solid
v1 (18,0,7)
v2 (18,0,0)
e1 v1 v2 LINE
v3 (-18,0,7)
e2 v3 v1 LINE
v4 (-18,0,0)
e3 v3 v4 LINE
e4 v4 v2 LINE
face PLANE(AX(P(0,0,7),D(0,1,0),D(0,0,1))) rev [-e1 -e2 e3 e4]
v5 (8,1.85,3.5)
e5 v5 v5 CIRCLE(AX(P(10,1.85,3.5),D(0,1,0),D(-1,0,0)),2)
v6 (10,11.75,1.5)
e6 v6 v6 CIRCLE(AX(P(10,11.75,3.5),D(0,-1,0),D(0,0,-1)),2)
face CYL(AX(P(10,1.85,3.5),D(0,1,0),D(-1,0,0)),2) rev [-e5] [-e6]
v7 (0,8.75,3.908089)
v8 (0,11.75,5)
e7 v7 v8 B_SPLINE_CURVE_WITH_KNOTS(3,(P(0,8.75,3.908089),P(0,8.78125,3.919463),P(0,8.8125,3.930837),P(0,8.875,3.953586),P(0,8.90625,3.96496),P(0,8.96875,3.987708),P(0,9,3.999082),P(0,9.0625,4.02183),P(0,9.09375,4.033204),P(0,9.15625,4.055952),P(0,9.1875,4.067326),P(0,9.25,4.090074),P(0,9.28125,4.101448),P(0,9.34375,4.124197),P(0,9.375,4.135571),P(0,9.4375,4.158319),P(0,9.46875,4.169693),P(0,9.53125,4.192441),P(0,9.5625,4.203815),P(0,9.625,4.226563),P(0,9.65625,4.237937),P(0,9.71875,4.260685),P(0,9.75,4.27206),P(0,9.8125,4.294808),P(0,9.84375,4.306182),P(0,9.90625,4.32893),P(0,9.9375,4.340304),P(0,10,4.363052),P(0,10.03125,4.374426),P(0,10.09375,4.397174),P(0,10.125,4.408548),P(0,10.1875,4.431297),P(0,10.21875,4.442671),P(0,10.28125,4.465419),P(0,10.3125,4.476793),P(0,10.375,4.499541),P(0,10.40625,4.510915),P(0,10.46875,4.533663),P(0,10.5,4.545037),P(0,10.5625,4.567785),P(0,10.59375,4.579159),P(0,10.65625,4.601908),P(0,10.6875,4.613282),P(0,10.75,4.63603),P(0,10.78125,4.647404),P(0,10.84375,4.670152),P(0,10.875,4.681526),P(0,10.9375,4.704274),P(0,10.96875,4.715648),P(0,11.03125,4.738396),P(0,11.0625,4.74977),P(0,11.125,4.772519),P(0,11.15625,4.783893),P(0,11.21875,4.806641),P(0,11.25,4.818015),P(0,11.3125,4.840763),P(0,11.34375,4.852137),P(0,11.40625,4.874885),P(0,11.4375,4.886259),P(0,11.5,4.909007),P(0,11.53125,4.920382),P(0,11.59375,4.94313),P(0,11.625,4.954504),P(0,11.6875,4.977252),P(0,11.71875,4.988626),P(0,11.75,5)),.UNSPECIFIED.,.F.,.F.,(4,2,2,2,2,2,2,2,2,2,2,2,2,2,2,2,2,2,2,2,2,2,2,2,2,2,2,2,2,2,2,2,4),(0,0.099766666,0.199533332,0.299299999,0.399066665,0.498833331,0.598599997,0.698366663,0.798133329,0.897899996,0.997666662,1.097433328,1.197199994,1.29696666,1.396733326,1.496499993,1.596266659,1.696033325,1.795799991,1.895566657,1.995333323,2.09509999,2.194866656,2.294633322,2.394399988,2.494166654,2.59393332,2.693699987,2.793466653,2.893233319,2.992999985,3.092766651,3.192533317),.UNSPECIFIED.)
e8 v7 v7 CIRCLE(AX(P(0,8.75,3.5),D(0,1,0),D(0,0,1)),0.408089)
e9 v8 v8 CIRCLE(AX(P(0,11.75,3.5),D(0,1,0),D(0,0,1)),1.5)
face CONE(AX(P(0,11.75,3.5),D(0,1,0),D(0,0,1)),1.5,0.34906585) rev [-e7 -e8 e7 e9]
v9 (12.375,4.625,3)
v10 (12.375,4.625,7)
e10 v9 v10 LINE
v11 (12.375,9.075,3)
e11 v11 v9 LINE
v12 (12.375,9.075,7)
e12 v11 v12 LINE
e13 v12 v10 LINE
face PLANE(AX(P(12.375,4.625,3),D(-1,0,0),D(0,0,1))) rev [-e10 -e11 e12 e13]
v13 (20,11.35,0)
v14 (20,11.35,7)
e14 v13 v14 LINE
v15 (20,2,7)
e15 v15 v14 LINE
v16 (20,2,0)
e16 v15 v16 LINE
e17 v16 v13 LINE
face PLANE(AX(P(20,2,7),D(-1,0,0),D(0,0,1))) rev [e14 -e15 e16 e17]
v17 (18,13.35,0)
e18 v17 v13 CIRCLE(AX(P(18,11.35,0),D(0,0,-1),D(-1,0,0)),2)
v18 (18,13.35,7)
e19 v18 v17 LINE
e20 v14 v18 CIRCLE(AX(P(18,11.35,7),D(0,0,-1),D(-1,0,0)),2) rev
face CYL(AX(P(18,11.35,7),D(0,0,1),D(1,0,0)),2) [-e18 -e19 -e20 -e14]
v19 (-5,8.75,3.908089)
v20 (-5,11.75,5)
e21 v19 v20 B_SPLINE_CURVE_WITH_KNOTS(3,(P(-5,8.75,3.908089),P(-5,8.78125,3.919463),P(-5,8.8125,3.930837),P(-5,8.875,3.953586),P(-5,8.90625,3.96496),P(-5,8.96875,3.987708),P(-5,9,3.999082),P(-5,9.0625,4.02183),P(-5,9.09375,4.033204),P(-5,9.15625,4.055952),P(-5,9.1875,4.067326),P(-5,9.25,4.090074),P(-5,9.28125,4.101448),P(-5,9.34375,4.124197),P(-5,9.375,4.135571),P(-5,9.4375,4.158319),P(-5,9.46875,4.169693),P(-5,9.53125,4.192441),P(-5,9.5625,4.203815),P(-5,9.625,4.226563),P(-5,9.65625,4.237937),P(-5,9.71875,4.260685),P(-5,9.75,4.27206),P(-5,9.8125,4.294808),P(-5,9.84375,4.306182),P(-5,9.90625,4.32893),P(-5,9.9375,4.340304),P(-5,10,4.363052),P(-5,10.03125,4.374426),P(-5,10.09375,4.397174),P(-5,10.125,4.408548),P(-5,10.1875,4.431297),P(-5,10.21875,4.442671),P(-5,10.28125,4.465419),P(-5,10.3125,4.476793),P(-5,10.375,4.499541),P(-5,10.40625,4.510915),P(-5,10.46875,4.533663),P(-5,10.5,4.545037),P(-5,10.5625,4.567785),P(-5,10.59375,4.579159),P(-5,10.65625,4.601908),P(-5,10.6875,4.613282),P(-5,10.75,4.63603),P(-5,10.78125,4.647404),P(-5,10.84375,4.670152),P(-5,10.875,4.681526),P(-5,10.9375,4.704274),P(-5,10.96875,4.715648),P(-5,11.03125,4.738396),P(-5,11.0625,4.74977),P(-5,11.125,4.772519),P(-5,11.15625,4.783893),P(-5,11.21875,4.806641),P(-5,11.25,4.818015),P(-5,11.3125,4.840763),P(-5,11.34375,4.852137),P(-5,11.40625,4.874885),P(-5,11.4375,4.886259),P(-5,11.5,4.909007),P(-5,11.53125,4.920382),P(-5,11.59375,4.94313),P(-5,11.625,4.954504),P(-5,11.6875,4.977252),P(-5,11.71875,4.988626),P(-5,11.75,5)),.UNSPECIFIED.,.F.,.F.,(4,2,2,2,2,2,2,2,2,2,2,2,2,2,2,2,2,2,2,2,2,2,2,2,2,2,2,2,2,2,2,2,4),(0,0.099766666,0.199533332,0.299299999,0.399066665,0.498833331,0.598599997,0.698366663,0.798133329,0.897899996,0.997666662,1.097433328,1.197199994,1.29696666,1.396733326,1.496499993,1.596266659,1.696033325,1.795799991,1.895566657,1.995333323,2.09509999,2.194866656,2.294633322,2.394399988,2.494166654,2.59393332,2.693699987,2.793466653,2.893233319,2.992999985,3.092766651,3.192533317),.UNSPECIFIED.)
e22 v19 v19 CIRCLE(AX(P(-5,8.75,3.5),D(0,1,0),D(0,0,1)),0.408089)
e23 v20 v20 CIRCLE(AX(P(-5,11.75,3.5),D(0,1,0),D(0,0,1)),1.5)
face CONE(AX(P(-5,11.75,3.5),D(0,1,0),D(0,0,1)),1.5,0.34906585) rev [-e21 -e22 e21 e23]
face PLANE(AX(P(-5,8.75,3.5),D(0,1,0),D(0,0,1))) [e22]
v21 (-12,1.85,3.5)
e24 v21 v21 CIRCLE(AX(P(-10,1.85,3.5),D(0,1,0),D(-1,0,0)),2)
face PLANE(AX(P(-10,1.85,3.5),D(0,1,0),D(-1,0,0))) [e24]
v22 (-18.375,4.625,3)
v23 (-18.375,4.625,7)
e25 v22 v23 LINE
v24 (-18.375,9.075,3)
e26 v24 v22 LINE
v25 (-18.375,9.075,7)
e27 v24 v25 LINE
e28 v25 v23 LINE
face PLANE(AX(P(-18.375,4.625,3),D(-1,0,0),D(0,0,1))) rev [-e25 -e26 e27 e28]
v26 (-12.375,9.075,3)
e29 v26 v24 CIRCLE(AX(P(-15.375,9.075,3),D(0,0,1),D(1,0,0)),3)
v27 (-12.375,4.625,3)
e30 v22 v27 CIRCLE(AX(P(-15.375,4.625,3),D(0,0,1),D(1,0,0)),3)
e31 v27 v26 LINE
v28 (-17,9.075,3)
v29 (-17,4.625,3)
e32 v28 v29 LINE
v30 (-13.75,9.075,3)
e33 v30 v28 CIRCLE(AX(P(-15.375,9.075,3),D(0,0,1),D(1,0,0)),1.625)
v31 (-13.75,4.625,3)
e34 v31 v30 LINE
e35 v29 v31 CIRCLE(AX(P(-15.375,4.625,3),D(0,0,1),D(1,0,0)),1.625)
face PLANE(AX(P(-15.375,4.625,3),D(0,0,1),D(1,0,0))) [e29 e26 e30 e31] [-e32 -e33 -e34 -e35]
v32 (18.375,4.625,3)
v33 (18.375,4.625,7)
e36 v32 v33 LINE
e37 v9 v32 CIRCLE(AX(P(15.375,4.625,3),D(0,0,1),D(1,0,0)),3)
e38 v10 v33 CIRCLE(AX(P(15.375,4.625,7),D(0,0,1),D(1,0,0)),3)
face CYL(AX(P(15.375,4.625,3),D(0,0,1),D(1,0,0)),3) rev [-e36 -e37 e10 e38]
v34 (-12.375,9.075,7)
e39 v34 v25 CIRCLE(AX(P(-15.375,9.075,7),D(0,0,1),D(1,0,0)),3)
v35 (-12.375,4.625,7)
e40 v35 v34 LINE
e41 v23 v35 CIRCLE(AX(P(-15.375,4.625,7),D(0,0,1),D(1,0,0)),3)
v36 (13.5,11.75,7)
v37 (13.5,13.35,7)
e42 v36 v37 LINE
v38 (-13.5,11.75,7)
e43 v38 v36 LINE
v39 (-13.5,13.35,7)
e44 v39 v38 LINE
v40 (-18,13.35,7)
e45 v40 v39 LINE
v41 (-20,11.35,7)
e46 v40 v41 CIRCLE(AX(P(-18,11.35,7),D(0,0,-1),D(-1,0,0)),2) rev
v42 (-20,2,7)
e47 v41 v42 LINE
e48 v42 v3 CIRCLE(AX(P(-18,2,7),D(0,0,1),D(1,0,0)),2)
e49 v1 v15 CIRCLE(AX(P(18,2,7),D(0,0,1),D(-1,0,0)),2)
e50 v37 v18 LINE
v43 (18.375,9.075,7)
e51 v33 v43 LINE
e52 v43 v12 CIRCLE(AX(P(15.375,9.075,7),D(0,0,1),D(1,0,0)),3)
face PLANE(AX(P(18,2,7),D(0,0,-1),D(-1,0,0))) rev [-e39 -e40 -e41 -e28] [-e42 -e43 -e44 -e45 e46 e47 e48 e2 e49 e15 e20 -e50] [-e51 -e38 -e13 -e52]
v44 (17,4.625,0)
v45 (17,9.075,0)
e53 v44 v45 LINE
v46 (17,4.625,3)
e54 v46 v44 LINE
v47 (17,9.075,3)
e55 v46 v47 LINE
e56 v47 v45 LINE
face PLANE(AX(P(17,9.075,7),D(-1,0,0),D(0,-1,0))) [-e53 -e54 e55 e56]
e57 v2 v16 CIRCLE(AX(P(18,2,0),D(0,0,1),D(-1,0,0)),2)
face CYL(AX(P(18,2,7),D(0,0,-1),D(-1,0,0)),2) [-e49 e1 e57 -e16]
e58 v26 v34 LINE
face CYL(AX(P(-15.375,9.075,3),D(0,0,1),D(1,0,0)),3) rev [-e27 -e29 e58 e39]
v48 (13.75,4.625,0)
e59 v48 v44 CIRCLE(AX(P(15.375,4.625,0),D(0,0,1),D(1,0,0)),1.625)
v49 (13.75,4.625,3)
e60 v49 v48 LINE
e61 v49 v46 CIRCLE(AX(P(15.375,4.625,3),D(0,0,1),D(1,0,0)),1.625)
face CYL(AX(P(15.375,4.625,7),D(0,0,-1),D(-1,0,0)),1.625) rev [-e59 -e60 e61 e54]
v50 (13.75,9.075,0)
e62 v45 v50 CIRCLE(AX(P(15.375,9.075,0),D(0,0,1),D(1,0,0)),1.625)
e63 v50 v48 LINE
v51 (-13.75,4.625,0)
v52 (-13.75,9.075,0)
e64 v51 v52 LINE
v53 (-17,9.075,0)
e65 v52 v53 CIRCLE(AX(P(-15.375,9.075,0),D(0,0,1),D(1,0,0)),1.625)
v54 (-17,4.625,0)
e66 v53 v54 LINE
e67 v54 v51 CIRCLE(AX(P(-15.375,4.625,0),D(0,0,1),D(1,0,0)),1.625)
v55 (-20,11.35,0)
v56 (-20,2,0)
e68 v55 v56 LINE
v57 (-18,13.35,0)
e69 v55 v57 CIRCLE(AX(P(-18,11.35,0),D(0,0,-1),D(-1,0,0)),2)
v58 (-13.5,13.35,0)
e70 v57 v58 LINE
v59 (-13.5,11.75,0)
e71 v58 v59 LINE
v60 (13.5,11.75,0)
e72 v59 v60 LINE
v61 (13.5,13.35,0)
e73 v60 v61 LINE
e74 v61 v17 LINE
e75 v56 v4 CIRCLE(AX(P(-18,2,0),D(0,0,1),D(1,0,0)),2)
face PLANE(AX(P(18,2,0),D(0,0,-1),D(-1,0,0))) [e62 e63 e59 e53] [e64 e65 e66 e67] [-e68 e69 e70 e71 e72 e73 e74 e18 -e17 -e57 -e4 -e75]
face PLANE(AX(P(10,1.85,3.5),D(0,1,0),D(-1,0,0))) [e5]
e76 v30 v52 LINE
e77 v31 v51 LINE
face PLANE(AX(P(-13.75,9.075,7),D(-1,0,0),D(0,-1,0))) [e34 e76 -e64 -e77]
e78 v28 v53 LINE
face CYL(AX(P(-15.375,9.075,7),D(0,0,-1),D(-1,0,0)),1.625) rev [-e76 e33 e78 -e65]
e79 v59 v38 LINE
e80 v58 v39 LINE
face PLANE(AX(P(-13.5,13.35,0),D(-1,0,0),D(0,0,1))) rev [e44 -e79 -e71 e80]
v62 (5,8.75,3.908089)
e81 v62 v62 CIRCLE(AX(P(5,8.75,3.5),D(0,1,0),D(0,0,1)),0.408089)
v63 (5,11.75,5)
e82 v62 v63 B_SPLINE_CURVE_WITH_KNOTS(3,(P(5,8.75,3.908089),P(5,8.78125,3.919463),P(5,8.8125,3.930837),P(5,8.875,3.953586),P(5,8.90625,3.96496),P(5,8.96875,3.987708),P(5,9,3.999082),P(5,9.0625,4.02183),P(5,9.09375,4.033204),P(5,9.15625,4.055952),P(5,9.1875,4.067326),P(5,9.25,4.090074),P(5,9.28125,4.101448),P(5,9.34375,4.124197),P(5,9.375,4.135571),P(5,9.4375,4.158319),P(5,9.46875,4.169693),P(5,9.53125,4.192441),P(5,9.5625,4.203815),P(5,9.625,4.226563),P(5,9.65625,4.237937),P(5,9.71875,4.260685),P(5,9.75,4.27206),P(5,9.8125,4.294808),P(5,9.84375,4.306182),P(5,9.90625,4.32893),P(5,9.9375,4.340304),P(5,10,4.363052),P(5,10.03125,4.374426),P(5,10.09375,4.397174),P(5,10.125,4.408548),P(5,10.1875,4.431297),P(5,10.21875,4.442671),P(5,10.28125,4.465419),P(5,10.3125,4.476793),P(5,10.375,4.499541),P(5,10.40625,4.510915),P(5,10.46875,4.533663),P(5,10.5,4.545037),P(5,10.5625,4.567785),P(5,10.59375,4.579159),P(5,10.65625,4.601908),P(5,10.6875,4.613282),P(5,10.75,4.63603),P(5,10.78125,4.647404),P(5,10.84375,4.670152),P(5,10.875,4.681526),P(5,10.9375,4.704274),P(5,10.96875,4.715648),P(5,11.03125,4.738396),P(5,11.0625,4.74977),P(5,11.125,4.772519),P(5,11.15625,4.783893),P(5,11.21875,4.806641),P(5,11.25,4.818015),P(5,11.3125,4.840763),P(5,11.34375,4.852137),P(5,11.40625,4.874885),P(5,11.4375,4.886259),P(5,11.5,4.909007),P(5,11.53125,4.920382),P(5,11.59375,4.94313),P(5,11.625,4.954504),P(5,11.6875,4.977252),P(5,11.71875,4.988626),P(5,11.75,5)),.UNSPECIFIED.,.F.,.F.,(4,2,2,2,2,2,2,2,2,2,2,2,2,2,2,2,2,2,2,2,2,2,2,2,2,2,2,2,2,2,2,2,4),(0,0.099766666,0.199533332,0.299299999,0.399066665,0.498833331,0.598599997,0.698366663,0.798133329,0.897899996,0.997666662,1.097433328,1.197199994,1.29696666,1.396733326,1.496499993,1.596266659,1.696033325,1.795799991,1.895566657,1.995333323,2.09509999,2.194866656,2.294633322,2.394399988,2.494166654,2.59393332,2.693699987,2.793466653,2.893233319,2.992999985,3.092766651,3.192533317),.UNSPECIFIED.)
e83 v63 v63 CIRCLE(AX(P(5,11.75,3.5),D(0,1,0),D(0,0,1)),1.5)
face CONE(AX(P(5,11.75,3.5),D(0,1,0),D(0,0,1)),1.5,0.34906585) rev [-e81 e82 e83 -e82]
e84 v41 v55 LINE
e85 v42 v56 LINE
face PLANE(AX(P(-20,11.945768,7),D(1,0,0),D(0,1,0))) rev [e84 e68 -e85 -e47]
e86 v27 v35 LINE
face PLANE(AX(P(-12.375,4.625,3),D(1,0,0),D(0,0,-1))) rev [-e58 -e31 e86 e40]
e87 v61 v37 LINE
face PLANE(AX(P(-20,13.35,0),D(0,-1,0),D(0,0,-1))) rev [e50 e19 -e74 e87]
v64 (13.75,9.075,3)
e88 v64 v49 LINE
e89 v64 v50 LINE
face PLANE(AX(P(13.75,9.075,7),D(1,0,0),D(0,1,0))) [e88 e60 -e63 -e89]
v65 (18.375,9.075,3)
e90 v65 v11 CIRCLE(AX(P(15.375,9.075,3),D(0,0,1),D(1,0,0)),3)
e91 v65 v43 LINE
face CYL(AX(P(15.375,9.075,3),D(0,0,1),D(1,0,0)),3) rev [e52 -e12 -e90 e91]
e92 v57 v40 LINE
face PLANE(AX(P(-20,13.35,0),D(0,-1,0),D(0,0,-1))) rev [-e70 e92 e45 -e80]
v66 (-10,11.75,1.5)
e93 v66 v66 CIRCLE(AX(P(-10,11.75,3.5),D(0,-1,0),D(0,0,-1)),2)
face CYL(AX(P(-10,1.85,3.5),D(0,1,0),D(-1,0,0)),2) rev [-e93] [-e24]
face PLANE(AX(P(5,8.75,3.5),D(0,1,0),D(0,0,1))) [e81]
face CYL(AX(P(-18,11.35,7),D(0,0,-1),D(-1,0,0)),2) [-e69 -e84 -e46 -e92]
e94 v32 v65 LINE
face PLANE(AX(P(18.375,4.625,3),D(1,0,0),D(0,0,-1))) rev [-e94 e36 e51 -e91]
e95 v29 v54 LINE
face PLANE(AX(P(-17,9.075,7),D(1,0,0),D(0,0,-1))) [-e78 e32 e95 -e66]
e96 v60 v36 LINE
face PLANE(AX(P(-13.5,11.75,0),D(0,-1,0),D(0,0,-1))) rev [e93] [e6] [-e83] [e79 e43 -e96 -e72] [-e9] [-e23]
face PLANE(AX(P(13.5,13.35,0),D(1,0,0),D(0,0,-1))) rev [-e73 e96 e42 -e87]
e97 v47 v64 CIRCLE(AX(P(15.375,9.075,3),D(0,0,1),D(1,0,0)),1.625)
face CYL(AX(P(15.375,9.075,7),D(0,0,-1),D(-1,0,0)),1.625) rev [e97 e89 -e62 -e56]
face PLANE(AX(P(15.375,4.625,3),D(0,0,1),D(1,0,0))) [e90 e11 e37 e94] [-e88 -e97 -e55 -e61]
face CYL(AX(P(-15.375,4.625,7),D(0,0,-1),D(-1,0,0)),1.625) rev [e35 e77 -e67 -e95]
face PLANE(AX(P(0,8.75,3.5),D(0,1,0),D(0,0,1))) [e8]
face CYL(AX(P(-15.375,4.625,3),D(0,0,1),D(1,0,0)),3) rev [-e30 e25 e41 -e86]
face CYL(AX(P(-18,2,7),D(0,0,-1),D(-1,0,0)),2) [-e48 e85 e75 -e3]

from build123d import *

# Parameters (mm, degrees)
BOSS_EXTRUDE1_DEPTH          = 7
CUT_EXTRUDE1_DEPTH           = 4
CUT_EXTRUDE4_DEPTH           = 30.03484975
SKETCH8_R                    = 2
CUT_EXTRUDE5_DEPTH           = 18
SKETCH9_R                    = 3
CUT_EXTRUDE6_DEPTH           = 8.1
SKETCH10_W                   = 40
SKETCH10_H                   = 6.5
CUT_EXTRUDE7_DEPTH           = 30.034849842
FILLET1_R                    = 2
SKETCH11_R                   = 1.5
CUT_EXTRUDE8_DEPTH           = 3
CUT_EXTRUDE8_DRAFT           = -20
CUT_EXTRUDE8_PROFILE_2_DEPTH = 3
CUT_EXTRUDE8_PROFILE_2_DRAFT = -20
CUT_EXTRUDE8_PROFILE_3_DEPTH = 3
CUT_EXTRUDE8_PROFILE_3_DRAFT = -20


with BuildPart() as part:
    # Sketch1 → Boss-Extrude1 (new body)
    with BuildSketch(Plane.XY):
        with BuildLine():
            Line((0, 0), (18, 0))
            ThreePointArc((18, 0), (19.414213562, 0.585786438), (20, 2))
            Line((20, 2), (20, 11.945768163))
            ThreePointArc((20, 11.945768163), (19.769252649, 12.878369398), (19.130254936, 13.595775369))
            Line((19.130254936, 13.595775369), (10.510938386, 19.500007206))
            ThreePointArc((10.510938386, 19.500007206), (9.972285338, 19.760499203), (9.380683449, 19.85))
            Line((9.380683449, 19.85), (-9.380683449, 19.85))
            ThreePointArc((-9.380683449, 19.85), (-9.972285338, 19.760499203), (-10.510938386, 19.500007206))
            Line((-10.510938386, 19.500007206), (-19.130254936, 13.595775369))
            ThreePointArc((-19.130254936, 13.595775369), (-19.769252649, 12.878369398), (-20, 11.945768163))
            Line((-20, 11.945768163), (-20, 2))
            ThreePointArc((-20, 2), (-19.414213562, 0.585786438), (-18, 0))
            Line((-18, 0), (0, 0))
        make_face()
        with BuildLine():
            Line((-13.75, 9.075), (-13.75, 4.625))
            ThreePointArc((-13.75, 4.625), (-15.375, 3), (-17, 4.625))
            Line((-17, 4.625), (-17, 9.075))
            ThreePointArc((-17, 9.075), (-15.375, 10.7), (-13.75, 9.075))
        make_face(mode=Mode.SUBTRACT)
        with BuildLine():
            Line((17, 9.075), (17, 4.625))
            ThreePointArc((17, 4.625), (15.375, 3), (13.75, 4.625))
            Line((13.75, 4.625), (13.75, 9.075))
            ThreePointArc((13.75, 9.075), (15.375, 10.7), (17, 9.075))
        make_face(mode=Mode.SUBTRACT)
    extrude(amount=BOSS_EXTRUDE1_DEPTH)

    # Sketch2 → Cut-Extrude1 (cut)
    with BuildSketch(Plane.XY.offset(7)):
        with BuildLine():
            Line((-18.375, 4.625), (-18.375, 9.075))
            ThreePointArc((-18.375, 9.075), (-15.375, 12.075), (-12.375, 9.075))
            Line((-12.375, 9.075), (-12.375, 4.625))
            ThreePointArc((-12.375, 4.625), (-15.375, 1.625), (-18.375, 4.625))
        make_face()
        with BuildLine():
            Line((12.375, 4.625), (12.375, 9.075))
            ThreePointArc((12.375, 9.075), (15.375, 12.075), (18.375, 9.075))
            Line((18.375, 9.075), (18.375, 4.625))
            ThreePointArc((18.375, 4.625), (15.375, 1.625), (12.375, 4.625))
        make_face()
    extrude(amount=-CUT_EXTRUDE1_DEPTH, mode=Mode.SUBTRACT)

    # Sketch6 → Cut-Extrude4 (cut, through all)
    with BuildSketch(Plane.XY.offset(7)):
        Polygon((-13.5, 13.35), (-6.5, 13.35), (-6.5, 19.85), (6.5, 19.85), (6.5, 13.35), (13.5, 13.35), (13.5, 11.75), (-13.5, 11.75), align=None)
    extrude(amount=-CUT_EXTRUDE4_DEPTH, mode=Mode.SUBTRACT)

    # Sketch8 → Cut-Extrude5 (cut)
    with BuildSketch(Plane(origin=(0, 19.85, 0), x_dir=(1, 0, 0), z_dir=(0, 1, 0))):
        with Locations(Location((-10, -3.5, 0), (0, 0, 180))):
            Circle(SKETCH8_R)
        with Locations(Location((10, -3.5, 0), (0, 0, 180))):
            Circle(SKETCH8_R)
    extrude(amount=-CUT_EXTRUDE5_DEPTH, mode=Mode.SUBTRACT)

    # Sketch9 → Cut-Extrude6 (cut)
    with BuildSketch(Plane(origin=(0, 19.85, 0), x_dir=(1, 0, 0), z_dir=(0, 1, 0))):
        with Locations(Location((10, -3.5, 0), (0, 0, 101.913740948))):
            Circle(SKETCH9_R)
        with Locations(Location((-10, -3.5, 0), (0, 0, 99.806006121))):
            Circle(SKETCH9_R)
    extrude(amount=-CUT_EXTRUDE6_DEPTH, mode=Mode.SUBTRACT)

    # Sketch10 → Cut-Extrude7 (cut, through all)
    with BuildSketch(Plane.XY.offset(7)):
        with Locations((0, 16.6)):
            Rectangle(SKETCH10_W, SKETCH10_H)
    extrude(amount=-CUT_EXTRUDE7_DEPTH, mode=Mode.SUBTRACT)

    # Fillet1
    # the kernel refuses this fillet: 2 mm, written as the material it takes off along each edge
    with BuildSketch(Plane(origin=(-19.424125327, 13.35, 12.203143064), x_dir=(-0.27669557885699486, -0.9609576247894558, 0), z_dir=(0, 0, -1))) as fillet1_piece_1:
        with BuildLine():
            CenterArc((1.527866068, -1.92191525), FILLET1_R, 73.936914891, 90)
            Line((-0.394049182, -1.368524092), (-0.586240707, -1.313184976))
            Line((-0.586240707, -1.313184976), (-0.192191525, 0.055339116))
            Line((-0.192191525, 0.055339116), (-0.095535811, 0.175706883))
            ThreePointArc((-0.095535811, 0.175706883), (1.564088383, 0.357037942), (2.136596341, 0.192191525))
            Line((2.136596341, 0.192191525), (2.081257226, 0))
        make_face()
    extrude(amount=17.406286128, mode=Mode.SUBTRACT)
    with BuildSketch(Plane(origin=(19.424125327, 13.35, 12.203143064), x_dir=(-1, 0, 0), z_dir=(0, 0, -1))) as fillet1_piece_2:
        with BuildLine():
            CenterArc((1.424125327, -2), FILLET1_R, 90, 90)
            Line((-0.575874673, -2), (-0.775874673, -2))
            ThreePointArc((-0.775874673, -2), (-0.775874673, -1.404231837), (-0.142412533, 0.140423184))
            Line((-0.142412533, 0.140423184), (0, 0.2))
            Line((0, 0.2), (1.424125327, 0.2))
            Line((1.424125327, 0.2), (1.424125327, 0))
        make_face()
    extrude(amount=17.406286128, mode=Mode.SUBTRACT)


with BuildPart() as cut_extrude8_tool:
    # Sketch11 → Cut-Extrude8 (with draft: the straight prism first)
    with BuildSketch(Plane(origin=(0, 11.75, 0), x_dir=(1, 0, 0), z_dir=(0, 1, 0))):
        with Locations((0, -3.5)):
            Circle(SKETCH11_R)
    extrude(amount=-CUT_EXTRUDE8_DEPTH)
    # Cut-Extrude8: the draft: its side faces are tilted about the plane it starts from
    cut_extrude8_sides = [cut_extrude8_tool.faces().sort_by_distance(p)[0] for p in [
        (-1.5, 10.25, 3.5),
    ]]
    draft(cut_extrude8_sides, Plane(origin=(0, 11.75, 0), x_dir=(1, 0, 0), z_dir=(0, 1, 0)), CUT_EXTRUDE8_DRAFT)


with BuildPart() as part_1:
    add(part.part)

    # Cut-Extrude8: cut by cut_extrude8_tool
    add(cut_extrude8_tool.part, mode=Mode.SUBTRACT)


with BuildPart() as cut_extrude8_profile_2_tool:
    # Sketch11 → Cut-Extrude8 profile 2 (with draft: the straight prism first)
    with BuildSketch(Plane(origin=(0, 11.75, 0), x_dir=(1, 0, 0), z_dir=(0, 1, 0))):
        with Locations((5, -3.5)):
            Circle(SKETCH11_R)
    extrude(amount=-CUT_EXTRUDE8_PROFILE_2_DEPTH)
    # Cut-Extrude8 profile 2: the draft: its side faces are tilted about the plane it starts from
    cut_extrude8_profile_2_sides = [cut_extrude8_profile_2_tool.faces().sort_by_distance(p)[0] for p in [
        (3.5, 10.25, 3.5),
    ]]
    draft(cut_extrude8_profile_2_sides, Plane(origin=(0, 11.75, 0), x_dir=(1, 0, 0), z_dir=(0, 1, 0)), CUT_EXTRUDE8_PROFILE_2_DRAFT)


with BuildPart() as part_2:
    add(part_1.part)

    # Cut-Extrude8 profile 2: cut by cut_extrude8_profile_2_tool
    add(cut_extrude8_profile_2_tool.part, mode=Mode.SUBTRACT)


with BuildPart() as cut_extrude8_profile_3_tool:
    # Sketch11 → Cut-Extrude8 profile 3 (with draft: the straight prism first)
    with BuildSketch(Plane(origin=(0, 11.75, 0), x_dir=(1, 0, 0), z_dir=(0, 1, 0))):
        with Locations((-5, -3.5)):
            Circle(SKETCH11_R)
    extrude(amount=-CUT_EXTRUDE8_PROFILE_3_DEPTH)
    # Cut-Extrude8 profile 3: the draft: its side faces are tilted about the plane it starts from
    cut_extrude8_profile_3_sides = [cut_extrude8_profile_3_tool.faces().sort_by_distance(p)[0] for p in [
        (-6.5, 10.25, 3.5),
    ]]
    draft(cut_extrude8_profile_3_sides, Plane(origin=(0, 11.75, 0), x_dir=(1, 0, 0), z_dir=(0, 1, 0)), CUT_EXTRUDE8_PROFILE_3_DRAFT)


with BuildPart() as part_3:
    add(part_2.part)

    # Cut-Extrude8 profile 3: cut by cut_extrude8_profile_3_tool
    add(cut_extrude8_profile_3_tool.part, mode=Mode.SUBTRACT)


solid = part_3.part
